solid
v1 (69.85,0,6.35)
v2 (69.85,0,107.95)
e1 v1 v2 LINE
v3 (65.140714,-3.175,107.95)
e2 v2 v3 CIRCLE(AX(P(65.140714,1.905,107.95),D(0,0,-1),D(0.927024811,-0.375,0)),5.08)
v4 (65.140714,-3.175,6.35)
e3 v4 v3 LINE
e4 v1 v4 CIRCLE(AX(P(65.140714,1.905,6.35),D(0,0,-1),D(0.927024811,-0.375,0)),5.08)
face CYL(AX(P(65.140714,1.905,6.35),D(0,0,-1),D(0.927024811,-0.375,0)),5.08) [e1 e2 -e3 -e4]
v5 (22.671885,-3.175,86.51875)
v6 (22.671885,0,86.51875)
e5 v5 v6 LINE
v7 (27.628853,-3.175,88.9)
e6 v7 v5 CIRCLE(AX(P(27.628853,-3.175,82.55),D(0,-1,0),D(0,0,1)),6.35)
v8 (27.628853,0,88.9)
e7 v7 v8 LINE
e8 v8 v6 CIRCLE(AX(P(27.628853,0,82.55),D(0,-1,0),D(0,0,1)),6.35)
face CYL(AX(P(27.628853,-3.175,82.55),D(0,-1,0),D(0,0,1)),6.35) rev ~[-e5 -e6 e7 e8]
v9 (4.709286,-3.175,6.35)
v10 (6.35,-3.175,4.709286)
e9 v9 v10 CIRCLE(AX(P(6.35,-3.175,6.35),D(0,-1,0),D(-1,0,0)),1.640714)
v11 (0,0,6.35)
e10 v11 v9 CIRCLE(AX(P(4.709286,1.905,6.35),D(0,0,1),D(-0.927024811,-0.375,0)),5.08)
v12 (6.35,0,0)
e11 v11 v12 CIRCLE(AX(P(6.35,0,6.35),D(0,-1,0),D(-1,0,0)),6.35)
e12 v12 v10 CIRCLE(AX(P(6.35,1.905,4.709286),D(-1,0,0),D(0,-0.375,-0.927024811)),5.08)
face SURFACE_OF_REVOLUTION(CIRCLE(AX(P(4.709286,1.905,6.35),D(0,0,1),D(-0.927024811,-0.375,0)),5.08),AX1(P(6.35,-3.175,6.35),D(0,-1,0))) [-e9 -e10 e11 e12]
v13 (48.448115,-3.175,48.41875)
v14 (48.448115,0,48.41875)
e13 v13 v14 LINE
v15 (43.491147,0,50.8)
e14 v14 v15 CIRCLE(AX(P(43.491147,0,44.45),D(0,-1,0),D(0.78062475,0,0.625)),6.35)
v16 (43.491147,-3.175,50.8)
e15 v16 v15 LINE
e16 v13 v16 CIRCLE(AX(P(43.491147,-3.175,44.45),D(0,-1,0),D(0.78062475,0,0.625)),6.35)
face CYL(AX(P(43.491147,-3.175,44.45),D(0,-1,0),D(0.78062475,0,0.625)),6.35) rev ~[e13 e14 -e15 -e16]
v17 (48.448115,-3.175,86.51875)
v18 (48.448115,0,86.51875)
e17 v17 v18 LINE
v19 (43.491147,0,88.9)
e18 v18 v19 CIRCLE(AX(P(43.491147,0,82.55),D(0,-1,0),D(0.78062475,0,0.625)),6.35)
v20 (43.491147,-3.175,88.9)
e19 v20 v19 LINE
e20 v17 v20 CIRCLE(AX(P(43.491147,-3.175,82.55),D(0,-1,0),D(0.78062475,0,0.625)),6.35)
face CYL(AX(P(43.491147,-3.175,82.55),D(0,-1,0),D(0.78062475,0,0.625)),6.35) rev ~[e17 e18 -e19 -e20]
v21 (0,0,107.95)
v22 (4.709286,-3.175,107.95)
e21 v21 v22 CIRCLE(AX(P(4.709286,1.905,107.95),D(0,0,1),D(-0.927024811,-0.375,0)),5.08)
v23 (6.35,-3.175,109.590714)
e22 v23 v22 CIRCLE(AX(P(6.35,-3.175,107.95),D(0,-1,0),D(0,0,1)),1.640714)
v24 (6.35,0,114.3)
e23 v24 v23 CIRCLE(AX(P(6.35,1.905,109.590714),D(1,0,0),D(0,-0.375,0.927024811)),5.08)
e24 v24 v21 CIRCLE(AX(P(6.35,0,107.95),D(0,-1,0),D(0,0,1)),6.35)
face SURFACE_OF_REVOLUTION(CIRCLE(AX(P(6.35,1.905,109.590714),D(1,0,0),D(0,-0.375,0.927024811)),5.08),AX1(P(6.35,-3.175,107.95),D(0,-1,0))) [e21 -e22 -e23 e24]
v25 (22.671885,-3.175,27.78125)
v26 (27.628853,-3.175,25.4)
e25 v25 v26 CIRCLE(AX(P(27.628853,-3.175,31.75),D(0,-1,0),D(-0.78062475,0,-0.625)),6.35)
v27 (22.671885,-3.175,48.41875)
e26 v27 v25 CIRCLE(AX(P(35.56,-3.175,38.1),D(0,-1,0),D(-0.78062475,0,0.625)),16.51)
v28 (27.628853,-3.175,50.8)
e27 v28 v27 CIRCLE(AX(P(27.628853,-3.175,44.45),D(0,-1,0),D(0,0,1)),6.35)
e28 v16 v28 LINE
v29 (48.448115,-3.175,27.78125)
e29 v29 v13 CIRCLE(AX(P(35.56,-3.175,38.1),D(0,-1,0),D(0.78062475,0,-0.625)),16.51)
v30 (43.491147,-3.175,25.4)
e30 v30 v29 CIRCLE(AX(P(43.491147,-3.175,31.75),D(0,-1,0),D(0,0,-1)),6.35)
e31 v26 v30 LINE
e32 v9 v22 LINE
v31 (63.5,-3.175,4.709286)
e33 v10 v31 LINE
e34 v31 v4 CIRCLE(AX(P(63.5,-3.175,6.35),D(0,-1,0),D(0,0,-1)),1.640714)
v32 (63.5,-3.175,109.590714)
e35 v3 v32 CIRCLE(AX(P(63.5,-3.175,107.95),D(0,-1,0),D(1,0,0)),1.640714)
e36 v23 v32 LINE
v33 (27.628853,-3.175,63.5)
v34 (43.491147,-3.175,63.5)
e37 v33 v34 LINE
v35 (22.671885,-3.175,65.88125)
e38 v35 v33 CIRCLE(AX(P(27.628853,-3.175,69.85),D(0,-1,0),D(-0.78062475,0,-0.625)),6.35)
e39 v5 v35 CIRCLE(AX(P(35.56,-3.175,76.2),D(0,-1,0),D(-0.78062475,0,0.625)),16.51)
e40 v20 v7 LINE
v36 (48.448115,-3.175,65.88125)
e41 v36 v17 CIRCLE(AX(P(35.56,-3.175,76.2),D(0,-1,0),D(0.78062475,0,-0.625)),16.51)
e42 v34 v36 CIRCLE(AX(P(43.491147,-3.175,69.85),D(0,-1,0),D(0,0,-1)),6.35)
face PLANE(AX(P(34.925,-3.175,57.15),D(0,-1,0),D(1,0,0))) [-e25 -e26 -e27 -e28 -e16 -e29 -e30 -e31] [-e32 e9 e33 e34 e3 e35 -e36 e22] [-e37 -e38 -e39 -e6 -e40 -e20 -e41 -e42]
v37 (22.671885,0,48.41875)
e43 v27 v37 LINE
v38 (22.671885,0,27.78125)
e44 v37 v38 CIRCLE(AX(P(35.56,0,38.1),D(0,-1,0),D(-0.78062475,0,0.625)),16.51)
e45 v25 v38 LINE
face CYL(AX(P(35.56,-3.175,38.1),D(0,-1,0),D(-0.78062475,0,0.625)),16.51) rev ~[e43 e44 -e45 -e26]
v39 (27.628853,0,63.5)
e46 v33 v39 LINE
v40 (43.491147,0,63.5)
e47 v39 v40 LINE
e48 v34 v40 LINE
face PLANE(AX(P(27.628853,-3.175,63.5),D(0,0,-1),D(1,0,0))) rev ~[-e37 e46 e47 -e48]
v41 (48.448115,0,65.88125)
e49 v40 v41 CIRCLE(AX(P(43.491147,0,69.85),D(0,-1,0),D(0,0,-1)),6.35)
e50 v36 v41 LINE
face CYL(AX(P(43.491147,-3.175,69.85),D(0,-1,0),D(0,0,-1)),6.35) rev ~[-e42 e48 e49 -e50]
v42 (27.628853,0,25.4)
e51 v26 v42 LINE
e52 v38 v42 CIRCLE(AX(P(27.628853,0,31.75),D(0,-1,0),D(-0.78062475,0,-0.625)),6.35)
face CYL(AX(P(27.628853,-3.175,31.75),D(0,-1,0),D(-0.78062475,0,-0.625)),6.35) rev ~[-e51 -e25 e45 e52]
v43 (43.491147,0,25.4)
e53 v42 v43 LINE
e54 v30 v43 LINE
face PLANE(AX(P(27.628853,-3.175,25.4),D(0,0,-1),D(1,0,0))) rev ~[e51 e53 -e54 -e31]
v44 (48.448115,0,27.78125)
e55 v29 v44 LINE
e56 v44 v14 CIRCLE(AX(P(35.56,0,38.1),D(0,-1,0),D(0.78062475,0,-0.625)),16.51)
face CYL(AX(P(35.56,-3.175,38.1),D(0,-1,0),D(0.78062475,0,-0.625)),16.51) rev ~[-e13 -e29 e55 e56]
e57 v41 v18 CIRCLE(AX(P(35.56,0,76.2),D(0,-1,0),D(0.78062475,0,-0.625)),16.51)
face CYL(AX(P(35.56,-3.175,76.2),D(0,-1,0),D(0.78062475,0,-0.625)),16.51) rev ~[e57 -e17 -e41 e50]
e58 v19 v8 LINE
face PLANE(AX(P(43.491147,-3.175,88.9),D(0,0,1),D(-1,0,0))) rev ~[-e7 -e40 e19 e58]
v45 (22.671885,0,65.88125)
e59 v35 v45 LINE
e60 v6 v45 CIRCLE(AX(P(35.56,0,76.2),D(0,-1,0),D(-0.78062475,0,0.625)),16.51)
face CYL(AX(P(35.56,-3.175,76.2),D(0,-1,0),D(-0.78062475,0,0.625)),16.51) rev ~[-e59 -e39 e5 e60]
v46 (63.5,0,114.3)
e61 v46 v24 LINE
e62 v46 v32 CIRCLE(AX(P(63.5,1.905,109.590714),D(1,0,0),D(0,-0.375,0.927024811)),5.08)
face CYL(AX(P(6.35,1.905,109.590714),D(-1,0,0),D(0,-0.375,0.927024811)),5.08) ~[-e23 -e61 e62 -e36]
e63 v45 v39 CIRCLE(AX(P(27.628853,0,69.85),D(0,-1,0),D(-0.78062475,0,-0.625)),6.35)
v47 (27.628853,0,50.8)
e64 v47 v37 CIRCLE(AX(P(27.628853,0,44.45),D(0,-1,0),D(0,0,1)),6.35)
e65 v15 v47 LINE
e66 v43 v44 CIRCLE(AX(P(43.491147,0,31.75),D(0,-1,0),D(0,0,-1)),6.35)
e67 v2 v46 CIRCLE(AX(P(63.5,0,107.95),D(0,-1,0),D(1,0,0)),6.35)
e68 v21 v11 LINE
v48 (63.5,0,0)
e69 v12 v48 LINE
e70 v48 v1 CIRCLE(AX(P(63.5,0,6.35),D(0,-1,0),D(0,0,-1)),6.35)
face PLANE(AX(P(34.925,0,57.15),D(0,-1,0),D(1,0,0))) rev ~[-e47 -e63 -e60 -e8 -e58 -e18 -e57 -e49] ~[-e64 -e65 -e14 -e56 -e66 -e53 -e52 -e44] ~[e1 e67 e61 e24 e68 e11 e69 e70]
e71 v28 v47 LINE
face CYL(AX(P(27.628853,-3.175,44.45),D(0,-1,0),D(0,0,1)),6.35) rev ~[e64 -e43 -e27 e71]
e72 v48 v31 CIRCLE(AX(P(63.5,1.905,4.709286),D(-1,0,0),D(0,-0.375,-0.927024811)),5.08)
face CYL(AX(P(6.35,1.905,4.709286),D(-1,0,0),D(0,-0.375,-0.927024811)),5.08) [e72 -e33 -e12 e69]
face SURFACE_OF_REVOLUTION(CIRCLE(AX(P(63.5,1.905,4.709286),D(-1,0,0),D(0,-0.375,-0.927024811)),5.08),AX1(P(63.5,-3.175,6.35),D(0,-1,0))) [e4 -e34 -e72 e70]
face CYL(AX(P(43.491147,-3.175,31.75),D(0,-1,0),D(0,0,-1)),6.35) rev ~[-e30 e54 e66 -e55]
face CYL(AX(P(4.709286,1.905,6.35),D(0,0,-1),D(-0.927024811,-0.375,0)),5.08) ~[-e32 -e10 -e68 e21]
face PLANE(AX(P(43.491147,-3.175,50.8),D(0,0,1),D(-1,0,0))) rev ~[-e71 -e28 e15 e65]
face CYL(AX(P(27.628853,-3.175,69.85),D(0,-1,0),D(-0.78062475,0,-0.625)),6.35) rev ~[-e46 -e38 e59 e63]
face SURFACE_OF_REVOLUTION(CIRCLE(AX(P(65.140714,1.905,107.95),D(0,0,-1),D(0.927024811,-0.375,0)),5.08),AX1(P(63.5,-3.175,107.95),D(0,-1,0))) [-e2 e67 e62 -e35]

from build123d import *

# Parameters (mm, degrees)
F1_DEPTH     = 3.175
F2_T1_DEPTH  = 57.15
F2_T3_DEPTH  = 101.6
F2_T6_ANGLE  = 90
F2_T8_ANGLE  = 90
F2_T10_ANGLE = 90
F2_T12_ANGLE = 90
F4_DEPTH     = 25.4


# Not quite as in the source:
# - a fillet or chamfer that OpenCascade refuses, or shapes differently, is made with other operations: its cross-section is extruded or revolved along the edge and cut away or added


with BuildPart() as f1:
    # F0 (on Front) → F1 (new body)
    with BuildSketch(Plane.XZ):
        with BuildLine():
            ThreePointArc((0, 6.35), (1.8598719395, 1.8598719395), (6.35, 0))
            Line((6.35, 0), (63.5, 0))
            ThreePointArc((63.5, 0), (67.9901280605, 1.8598719395), (69.85, 6.35))
            Line((69.85, 6.35), (69.85, 107.95))
            ThreePointArc((69.85, 107.95), (67.9901280605, 112.4401280605), (63.5, 114.3))
            Line((63.5, 114.3), (6.35, 114.3))
            ThreePointArc((6.35, 114.3), (1.8598719395, 112.4401280605), (0, 107.95))
            Line((0, 107.95), (0, 6.35))
        make_face()
    extrude(amount=F1_DEPTH)

    # F2: fillet of radius 5.08 on 1 edges, made by hand

    # F2_s2 → F2_t1 (cut)
    with BuildSketch(Plane.YZ.offset(6.35)):
        with BuildLine():
            ThreePointArc((0, 114.3), (-2.3071134838, 112.4305202921), (-3.175, 109.5907139607))
            Line((-3.175, 109.5907139607), (-3.175, 114.3))
            Line((-3.175, 114.3), (0, 114.3))
        make_face()
        with BuildLine():
            ThreePointArc((0, 0), (-2.3071134838, 1.8694797079), (-3.175, 4.7092860393))
            Line((-3.175, 4.7092860393), (-3.175, 0))
            Line((-3.175, 0), (0, 0))
        make_face()
    extrude(amount=F2_T1_DEPTH, mode=Mode.SUBTRACT)

    # F2_s4 → F2_t3 (cut)
    with BuildSketch(Plane.XY.offset(6.35)):
        with BuildLine():
            ThreePointArc((0, 0), (1.8694797079, -2.3071134838), (4.7092860393, -3.175))
            Line((4.7092860393, -3.175), (0, -3.175))
            Line((0, -3.175), (0, 0))
        make_face()
        with BuildLine():
            ThreePointArc((69.85, 0), (67.9805202921, -2.3071134838), (65.1407139607, -3.175))
            Line((65.1407139607, -3.175), (69.85, -3.175))
            Line((69.85, -3.175), (69.85, 0))
        make_face()
    extrude(amount=F2_T3_DEPTH, mode=Mode.SUBTRACT)

    # F2_s5 → F2_t6 (revolve, cut)
    with BuildSketch(Plane.XY.offset(107.95)):
        with BuildLine():
            ThreePointArc((69.85, 0), (67.9805202921, -2.3071134838), (65.1407139607, -3.175))
            Line((65.1407139607, -3.175), (69.85, -3.175))
            Line((69.85, -3.175), (69.85, 0))
        make_face()
    revolve(axis=Axis((63.5, -3.175, 107.95), (0, -1, 0)), revolution_arc=F2_T6_ANGLE, mode=Mode.SUBTRACT)

    # F2_s7 → F2_t8 (revolve, cut)
    with BuildSketch(Plane.YZ.offset(6.35)):
        with BuildLine():
            ThreePointArc((0, 114.3), (-2.3071134838, 112.4305202921), (-3.175, 109.5907139607))
            Line((-3.175, 109.5907139607), (-3.175, 114.3))
            Line((-3.175, 114.3), (0, 114.3))
        make_face()
    revolve(axis=Axis((6.35, -3.175, 107.95), (0, -1, 0)), revolution_arc=F2_T8_ANGLE, mode=Mode.SUBTRACT)

    # F2_s9 → F2_t10 (revolve, cut)
    with BuildSketch(Plane.XY.offset(6.35)):
        with BuildLine():
            ThreePointArc((0, 0), (1.8694797079, -2.3071134838), (4.7092860393, -3.175))
            Line((4.7092860393, -3.175), (0, -3.175))
            Line((0, -3.175), (0, 0))
        make_face()
    revolve(axis=Axis((6.35, -3.175, 6.35), (0, -1, 0)), revolution_arc=F2_T10_ANGLE, mode=Mode.SUBTRACT)

    # F2_s11 → F2_t12 (revolve, cut)
    with BuildSketch(Plane.YZ.offset(63.5)):
        with BuildLine():
            ThreePointArc((0, 0), (-2.3071134838, 1.8694797079), (-3.175, 4.7092860393))
            Line((-3.175, 4.7092860393), (-3.175, 0))
            Line((-3.175, 0), (0, 0))
        make_face()
    revolve(axis=Axis((63.5, -3.175, 6.35), (0, -1, 0)), revolution_arc=F2_T12_ANGLE, mode=Mode.SUBTRACT)

    # F3 (on face) → F4 (cut)
    with BuildSketch(Plane.XZ.offset(3.175)):
        with BuildLine():
            ThreePointArc((27.628852542, 88.9), (24.879221885, 88.2738126498), (22.6718853808, 86.51875))
            ThreePointArc((22.6718853808, 86.51875), (19.05, 76.2), (22.6718853808, 65.88125))
            ThreePointArc((22.6718853808, 65.88125), (24.879221885, 64.1261873502), (27.628852542, 63.5))
            Line((27.628852542, 63.5), (43.491147458, 63.5))
            ThreePointArc((43.491147458, 63.5), (46.240778115, 64.1261873502), (48.4481146192, 65.88125))
            ThreePointArc((48.4481146192, 65.88125), (52.07, 76.2), (48.4481146192, 86.51875))
            ThreePointArc((48.4481146192, 86.51875), (46.240778115, 88.2738126498), (43.491147458, 88.9))
            Line((43.491147458, 88.9), (27.628852542, 88.9))
        make_face()
        with BuildLine():
            ThreePointArc((22.6718853808, 27.78125), (24.879221885, 26.0261873502), (27.628852542, 25.4))
            Line((27.628852542, 25.4), (43.491147458, 25.4))
            ThreePointArc((43.491147458, 25.4), (46.240778115, 26.0261873502), (48.4481146192, 27.78125))
            ThreePointArc((48.4481146192, 27.78125), (52.07, 38.1), (48.4481146192, 48.41875))
            ThreePointArc((48.4481146192, 48.41875), (46.240778115, 50.1738126498), (43.491147458, 50.8))
            Line((43.491147458, 50.8), (27.628852542, 50.8))
            ThreePointArc((27.628852542, 50.8), (24.879221885, 50.1738126498), (22.6718853808, 48.41875))
            ThreePointArc((22.6718853808, 48.41875), (19.05, 38.1), (22.6718853808, 27.78125))
        make_face()
    extrude(amount=-F4_DEPTH, mode=Mode.SUBTRACT)


solid = f1.part
